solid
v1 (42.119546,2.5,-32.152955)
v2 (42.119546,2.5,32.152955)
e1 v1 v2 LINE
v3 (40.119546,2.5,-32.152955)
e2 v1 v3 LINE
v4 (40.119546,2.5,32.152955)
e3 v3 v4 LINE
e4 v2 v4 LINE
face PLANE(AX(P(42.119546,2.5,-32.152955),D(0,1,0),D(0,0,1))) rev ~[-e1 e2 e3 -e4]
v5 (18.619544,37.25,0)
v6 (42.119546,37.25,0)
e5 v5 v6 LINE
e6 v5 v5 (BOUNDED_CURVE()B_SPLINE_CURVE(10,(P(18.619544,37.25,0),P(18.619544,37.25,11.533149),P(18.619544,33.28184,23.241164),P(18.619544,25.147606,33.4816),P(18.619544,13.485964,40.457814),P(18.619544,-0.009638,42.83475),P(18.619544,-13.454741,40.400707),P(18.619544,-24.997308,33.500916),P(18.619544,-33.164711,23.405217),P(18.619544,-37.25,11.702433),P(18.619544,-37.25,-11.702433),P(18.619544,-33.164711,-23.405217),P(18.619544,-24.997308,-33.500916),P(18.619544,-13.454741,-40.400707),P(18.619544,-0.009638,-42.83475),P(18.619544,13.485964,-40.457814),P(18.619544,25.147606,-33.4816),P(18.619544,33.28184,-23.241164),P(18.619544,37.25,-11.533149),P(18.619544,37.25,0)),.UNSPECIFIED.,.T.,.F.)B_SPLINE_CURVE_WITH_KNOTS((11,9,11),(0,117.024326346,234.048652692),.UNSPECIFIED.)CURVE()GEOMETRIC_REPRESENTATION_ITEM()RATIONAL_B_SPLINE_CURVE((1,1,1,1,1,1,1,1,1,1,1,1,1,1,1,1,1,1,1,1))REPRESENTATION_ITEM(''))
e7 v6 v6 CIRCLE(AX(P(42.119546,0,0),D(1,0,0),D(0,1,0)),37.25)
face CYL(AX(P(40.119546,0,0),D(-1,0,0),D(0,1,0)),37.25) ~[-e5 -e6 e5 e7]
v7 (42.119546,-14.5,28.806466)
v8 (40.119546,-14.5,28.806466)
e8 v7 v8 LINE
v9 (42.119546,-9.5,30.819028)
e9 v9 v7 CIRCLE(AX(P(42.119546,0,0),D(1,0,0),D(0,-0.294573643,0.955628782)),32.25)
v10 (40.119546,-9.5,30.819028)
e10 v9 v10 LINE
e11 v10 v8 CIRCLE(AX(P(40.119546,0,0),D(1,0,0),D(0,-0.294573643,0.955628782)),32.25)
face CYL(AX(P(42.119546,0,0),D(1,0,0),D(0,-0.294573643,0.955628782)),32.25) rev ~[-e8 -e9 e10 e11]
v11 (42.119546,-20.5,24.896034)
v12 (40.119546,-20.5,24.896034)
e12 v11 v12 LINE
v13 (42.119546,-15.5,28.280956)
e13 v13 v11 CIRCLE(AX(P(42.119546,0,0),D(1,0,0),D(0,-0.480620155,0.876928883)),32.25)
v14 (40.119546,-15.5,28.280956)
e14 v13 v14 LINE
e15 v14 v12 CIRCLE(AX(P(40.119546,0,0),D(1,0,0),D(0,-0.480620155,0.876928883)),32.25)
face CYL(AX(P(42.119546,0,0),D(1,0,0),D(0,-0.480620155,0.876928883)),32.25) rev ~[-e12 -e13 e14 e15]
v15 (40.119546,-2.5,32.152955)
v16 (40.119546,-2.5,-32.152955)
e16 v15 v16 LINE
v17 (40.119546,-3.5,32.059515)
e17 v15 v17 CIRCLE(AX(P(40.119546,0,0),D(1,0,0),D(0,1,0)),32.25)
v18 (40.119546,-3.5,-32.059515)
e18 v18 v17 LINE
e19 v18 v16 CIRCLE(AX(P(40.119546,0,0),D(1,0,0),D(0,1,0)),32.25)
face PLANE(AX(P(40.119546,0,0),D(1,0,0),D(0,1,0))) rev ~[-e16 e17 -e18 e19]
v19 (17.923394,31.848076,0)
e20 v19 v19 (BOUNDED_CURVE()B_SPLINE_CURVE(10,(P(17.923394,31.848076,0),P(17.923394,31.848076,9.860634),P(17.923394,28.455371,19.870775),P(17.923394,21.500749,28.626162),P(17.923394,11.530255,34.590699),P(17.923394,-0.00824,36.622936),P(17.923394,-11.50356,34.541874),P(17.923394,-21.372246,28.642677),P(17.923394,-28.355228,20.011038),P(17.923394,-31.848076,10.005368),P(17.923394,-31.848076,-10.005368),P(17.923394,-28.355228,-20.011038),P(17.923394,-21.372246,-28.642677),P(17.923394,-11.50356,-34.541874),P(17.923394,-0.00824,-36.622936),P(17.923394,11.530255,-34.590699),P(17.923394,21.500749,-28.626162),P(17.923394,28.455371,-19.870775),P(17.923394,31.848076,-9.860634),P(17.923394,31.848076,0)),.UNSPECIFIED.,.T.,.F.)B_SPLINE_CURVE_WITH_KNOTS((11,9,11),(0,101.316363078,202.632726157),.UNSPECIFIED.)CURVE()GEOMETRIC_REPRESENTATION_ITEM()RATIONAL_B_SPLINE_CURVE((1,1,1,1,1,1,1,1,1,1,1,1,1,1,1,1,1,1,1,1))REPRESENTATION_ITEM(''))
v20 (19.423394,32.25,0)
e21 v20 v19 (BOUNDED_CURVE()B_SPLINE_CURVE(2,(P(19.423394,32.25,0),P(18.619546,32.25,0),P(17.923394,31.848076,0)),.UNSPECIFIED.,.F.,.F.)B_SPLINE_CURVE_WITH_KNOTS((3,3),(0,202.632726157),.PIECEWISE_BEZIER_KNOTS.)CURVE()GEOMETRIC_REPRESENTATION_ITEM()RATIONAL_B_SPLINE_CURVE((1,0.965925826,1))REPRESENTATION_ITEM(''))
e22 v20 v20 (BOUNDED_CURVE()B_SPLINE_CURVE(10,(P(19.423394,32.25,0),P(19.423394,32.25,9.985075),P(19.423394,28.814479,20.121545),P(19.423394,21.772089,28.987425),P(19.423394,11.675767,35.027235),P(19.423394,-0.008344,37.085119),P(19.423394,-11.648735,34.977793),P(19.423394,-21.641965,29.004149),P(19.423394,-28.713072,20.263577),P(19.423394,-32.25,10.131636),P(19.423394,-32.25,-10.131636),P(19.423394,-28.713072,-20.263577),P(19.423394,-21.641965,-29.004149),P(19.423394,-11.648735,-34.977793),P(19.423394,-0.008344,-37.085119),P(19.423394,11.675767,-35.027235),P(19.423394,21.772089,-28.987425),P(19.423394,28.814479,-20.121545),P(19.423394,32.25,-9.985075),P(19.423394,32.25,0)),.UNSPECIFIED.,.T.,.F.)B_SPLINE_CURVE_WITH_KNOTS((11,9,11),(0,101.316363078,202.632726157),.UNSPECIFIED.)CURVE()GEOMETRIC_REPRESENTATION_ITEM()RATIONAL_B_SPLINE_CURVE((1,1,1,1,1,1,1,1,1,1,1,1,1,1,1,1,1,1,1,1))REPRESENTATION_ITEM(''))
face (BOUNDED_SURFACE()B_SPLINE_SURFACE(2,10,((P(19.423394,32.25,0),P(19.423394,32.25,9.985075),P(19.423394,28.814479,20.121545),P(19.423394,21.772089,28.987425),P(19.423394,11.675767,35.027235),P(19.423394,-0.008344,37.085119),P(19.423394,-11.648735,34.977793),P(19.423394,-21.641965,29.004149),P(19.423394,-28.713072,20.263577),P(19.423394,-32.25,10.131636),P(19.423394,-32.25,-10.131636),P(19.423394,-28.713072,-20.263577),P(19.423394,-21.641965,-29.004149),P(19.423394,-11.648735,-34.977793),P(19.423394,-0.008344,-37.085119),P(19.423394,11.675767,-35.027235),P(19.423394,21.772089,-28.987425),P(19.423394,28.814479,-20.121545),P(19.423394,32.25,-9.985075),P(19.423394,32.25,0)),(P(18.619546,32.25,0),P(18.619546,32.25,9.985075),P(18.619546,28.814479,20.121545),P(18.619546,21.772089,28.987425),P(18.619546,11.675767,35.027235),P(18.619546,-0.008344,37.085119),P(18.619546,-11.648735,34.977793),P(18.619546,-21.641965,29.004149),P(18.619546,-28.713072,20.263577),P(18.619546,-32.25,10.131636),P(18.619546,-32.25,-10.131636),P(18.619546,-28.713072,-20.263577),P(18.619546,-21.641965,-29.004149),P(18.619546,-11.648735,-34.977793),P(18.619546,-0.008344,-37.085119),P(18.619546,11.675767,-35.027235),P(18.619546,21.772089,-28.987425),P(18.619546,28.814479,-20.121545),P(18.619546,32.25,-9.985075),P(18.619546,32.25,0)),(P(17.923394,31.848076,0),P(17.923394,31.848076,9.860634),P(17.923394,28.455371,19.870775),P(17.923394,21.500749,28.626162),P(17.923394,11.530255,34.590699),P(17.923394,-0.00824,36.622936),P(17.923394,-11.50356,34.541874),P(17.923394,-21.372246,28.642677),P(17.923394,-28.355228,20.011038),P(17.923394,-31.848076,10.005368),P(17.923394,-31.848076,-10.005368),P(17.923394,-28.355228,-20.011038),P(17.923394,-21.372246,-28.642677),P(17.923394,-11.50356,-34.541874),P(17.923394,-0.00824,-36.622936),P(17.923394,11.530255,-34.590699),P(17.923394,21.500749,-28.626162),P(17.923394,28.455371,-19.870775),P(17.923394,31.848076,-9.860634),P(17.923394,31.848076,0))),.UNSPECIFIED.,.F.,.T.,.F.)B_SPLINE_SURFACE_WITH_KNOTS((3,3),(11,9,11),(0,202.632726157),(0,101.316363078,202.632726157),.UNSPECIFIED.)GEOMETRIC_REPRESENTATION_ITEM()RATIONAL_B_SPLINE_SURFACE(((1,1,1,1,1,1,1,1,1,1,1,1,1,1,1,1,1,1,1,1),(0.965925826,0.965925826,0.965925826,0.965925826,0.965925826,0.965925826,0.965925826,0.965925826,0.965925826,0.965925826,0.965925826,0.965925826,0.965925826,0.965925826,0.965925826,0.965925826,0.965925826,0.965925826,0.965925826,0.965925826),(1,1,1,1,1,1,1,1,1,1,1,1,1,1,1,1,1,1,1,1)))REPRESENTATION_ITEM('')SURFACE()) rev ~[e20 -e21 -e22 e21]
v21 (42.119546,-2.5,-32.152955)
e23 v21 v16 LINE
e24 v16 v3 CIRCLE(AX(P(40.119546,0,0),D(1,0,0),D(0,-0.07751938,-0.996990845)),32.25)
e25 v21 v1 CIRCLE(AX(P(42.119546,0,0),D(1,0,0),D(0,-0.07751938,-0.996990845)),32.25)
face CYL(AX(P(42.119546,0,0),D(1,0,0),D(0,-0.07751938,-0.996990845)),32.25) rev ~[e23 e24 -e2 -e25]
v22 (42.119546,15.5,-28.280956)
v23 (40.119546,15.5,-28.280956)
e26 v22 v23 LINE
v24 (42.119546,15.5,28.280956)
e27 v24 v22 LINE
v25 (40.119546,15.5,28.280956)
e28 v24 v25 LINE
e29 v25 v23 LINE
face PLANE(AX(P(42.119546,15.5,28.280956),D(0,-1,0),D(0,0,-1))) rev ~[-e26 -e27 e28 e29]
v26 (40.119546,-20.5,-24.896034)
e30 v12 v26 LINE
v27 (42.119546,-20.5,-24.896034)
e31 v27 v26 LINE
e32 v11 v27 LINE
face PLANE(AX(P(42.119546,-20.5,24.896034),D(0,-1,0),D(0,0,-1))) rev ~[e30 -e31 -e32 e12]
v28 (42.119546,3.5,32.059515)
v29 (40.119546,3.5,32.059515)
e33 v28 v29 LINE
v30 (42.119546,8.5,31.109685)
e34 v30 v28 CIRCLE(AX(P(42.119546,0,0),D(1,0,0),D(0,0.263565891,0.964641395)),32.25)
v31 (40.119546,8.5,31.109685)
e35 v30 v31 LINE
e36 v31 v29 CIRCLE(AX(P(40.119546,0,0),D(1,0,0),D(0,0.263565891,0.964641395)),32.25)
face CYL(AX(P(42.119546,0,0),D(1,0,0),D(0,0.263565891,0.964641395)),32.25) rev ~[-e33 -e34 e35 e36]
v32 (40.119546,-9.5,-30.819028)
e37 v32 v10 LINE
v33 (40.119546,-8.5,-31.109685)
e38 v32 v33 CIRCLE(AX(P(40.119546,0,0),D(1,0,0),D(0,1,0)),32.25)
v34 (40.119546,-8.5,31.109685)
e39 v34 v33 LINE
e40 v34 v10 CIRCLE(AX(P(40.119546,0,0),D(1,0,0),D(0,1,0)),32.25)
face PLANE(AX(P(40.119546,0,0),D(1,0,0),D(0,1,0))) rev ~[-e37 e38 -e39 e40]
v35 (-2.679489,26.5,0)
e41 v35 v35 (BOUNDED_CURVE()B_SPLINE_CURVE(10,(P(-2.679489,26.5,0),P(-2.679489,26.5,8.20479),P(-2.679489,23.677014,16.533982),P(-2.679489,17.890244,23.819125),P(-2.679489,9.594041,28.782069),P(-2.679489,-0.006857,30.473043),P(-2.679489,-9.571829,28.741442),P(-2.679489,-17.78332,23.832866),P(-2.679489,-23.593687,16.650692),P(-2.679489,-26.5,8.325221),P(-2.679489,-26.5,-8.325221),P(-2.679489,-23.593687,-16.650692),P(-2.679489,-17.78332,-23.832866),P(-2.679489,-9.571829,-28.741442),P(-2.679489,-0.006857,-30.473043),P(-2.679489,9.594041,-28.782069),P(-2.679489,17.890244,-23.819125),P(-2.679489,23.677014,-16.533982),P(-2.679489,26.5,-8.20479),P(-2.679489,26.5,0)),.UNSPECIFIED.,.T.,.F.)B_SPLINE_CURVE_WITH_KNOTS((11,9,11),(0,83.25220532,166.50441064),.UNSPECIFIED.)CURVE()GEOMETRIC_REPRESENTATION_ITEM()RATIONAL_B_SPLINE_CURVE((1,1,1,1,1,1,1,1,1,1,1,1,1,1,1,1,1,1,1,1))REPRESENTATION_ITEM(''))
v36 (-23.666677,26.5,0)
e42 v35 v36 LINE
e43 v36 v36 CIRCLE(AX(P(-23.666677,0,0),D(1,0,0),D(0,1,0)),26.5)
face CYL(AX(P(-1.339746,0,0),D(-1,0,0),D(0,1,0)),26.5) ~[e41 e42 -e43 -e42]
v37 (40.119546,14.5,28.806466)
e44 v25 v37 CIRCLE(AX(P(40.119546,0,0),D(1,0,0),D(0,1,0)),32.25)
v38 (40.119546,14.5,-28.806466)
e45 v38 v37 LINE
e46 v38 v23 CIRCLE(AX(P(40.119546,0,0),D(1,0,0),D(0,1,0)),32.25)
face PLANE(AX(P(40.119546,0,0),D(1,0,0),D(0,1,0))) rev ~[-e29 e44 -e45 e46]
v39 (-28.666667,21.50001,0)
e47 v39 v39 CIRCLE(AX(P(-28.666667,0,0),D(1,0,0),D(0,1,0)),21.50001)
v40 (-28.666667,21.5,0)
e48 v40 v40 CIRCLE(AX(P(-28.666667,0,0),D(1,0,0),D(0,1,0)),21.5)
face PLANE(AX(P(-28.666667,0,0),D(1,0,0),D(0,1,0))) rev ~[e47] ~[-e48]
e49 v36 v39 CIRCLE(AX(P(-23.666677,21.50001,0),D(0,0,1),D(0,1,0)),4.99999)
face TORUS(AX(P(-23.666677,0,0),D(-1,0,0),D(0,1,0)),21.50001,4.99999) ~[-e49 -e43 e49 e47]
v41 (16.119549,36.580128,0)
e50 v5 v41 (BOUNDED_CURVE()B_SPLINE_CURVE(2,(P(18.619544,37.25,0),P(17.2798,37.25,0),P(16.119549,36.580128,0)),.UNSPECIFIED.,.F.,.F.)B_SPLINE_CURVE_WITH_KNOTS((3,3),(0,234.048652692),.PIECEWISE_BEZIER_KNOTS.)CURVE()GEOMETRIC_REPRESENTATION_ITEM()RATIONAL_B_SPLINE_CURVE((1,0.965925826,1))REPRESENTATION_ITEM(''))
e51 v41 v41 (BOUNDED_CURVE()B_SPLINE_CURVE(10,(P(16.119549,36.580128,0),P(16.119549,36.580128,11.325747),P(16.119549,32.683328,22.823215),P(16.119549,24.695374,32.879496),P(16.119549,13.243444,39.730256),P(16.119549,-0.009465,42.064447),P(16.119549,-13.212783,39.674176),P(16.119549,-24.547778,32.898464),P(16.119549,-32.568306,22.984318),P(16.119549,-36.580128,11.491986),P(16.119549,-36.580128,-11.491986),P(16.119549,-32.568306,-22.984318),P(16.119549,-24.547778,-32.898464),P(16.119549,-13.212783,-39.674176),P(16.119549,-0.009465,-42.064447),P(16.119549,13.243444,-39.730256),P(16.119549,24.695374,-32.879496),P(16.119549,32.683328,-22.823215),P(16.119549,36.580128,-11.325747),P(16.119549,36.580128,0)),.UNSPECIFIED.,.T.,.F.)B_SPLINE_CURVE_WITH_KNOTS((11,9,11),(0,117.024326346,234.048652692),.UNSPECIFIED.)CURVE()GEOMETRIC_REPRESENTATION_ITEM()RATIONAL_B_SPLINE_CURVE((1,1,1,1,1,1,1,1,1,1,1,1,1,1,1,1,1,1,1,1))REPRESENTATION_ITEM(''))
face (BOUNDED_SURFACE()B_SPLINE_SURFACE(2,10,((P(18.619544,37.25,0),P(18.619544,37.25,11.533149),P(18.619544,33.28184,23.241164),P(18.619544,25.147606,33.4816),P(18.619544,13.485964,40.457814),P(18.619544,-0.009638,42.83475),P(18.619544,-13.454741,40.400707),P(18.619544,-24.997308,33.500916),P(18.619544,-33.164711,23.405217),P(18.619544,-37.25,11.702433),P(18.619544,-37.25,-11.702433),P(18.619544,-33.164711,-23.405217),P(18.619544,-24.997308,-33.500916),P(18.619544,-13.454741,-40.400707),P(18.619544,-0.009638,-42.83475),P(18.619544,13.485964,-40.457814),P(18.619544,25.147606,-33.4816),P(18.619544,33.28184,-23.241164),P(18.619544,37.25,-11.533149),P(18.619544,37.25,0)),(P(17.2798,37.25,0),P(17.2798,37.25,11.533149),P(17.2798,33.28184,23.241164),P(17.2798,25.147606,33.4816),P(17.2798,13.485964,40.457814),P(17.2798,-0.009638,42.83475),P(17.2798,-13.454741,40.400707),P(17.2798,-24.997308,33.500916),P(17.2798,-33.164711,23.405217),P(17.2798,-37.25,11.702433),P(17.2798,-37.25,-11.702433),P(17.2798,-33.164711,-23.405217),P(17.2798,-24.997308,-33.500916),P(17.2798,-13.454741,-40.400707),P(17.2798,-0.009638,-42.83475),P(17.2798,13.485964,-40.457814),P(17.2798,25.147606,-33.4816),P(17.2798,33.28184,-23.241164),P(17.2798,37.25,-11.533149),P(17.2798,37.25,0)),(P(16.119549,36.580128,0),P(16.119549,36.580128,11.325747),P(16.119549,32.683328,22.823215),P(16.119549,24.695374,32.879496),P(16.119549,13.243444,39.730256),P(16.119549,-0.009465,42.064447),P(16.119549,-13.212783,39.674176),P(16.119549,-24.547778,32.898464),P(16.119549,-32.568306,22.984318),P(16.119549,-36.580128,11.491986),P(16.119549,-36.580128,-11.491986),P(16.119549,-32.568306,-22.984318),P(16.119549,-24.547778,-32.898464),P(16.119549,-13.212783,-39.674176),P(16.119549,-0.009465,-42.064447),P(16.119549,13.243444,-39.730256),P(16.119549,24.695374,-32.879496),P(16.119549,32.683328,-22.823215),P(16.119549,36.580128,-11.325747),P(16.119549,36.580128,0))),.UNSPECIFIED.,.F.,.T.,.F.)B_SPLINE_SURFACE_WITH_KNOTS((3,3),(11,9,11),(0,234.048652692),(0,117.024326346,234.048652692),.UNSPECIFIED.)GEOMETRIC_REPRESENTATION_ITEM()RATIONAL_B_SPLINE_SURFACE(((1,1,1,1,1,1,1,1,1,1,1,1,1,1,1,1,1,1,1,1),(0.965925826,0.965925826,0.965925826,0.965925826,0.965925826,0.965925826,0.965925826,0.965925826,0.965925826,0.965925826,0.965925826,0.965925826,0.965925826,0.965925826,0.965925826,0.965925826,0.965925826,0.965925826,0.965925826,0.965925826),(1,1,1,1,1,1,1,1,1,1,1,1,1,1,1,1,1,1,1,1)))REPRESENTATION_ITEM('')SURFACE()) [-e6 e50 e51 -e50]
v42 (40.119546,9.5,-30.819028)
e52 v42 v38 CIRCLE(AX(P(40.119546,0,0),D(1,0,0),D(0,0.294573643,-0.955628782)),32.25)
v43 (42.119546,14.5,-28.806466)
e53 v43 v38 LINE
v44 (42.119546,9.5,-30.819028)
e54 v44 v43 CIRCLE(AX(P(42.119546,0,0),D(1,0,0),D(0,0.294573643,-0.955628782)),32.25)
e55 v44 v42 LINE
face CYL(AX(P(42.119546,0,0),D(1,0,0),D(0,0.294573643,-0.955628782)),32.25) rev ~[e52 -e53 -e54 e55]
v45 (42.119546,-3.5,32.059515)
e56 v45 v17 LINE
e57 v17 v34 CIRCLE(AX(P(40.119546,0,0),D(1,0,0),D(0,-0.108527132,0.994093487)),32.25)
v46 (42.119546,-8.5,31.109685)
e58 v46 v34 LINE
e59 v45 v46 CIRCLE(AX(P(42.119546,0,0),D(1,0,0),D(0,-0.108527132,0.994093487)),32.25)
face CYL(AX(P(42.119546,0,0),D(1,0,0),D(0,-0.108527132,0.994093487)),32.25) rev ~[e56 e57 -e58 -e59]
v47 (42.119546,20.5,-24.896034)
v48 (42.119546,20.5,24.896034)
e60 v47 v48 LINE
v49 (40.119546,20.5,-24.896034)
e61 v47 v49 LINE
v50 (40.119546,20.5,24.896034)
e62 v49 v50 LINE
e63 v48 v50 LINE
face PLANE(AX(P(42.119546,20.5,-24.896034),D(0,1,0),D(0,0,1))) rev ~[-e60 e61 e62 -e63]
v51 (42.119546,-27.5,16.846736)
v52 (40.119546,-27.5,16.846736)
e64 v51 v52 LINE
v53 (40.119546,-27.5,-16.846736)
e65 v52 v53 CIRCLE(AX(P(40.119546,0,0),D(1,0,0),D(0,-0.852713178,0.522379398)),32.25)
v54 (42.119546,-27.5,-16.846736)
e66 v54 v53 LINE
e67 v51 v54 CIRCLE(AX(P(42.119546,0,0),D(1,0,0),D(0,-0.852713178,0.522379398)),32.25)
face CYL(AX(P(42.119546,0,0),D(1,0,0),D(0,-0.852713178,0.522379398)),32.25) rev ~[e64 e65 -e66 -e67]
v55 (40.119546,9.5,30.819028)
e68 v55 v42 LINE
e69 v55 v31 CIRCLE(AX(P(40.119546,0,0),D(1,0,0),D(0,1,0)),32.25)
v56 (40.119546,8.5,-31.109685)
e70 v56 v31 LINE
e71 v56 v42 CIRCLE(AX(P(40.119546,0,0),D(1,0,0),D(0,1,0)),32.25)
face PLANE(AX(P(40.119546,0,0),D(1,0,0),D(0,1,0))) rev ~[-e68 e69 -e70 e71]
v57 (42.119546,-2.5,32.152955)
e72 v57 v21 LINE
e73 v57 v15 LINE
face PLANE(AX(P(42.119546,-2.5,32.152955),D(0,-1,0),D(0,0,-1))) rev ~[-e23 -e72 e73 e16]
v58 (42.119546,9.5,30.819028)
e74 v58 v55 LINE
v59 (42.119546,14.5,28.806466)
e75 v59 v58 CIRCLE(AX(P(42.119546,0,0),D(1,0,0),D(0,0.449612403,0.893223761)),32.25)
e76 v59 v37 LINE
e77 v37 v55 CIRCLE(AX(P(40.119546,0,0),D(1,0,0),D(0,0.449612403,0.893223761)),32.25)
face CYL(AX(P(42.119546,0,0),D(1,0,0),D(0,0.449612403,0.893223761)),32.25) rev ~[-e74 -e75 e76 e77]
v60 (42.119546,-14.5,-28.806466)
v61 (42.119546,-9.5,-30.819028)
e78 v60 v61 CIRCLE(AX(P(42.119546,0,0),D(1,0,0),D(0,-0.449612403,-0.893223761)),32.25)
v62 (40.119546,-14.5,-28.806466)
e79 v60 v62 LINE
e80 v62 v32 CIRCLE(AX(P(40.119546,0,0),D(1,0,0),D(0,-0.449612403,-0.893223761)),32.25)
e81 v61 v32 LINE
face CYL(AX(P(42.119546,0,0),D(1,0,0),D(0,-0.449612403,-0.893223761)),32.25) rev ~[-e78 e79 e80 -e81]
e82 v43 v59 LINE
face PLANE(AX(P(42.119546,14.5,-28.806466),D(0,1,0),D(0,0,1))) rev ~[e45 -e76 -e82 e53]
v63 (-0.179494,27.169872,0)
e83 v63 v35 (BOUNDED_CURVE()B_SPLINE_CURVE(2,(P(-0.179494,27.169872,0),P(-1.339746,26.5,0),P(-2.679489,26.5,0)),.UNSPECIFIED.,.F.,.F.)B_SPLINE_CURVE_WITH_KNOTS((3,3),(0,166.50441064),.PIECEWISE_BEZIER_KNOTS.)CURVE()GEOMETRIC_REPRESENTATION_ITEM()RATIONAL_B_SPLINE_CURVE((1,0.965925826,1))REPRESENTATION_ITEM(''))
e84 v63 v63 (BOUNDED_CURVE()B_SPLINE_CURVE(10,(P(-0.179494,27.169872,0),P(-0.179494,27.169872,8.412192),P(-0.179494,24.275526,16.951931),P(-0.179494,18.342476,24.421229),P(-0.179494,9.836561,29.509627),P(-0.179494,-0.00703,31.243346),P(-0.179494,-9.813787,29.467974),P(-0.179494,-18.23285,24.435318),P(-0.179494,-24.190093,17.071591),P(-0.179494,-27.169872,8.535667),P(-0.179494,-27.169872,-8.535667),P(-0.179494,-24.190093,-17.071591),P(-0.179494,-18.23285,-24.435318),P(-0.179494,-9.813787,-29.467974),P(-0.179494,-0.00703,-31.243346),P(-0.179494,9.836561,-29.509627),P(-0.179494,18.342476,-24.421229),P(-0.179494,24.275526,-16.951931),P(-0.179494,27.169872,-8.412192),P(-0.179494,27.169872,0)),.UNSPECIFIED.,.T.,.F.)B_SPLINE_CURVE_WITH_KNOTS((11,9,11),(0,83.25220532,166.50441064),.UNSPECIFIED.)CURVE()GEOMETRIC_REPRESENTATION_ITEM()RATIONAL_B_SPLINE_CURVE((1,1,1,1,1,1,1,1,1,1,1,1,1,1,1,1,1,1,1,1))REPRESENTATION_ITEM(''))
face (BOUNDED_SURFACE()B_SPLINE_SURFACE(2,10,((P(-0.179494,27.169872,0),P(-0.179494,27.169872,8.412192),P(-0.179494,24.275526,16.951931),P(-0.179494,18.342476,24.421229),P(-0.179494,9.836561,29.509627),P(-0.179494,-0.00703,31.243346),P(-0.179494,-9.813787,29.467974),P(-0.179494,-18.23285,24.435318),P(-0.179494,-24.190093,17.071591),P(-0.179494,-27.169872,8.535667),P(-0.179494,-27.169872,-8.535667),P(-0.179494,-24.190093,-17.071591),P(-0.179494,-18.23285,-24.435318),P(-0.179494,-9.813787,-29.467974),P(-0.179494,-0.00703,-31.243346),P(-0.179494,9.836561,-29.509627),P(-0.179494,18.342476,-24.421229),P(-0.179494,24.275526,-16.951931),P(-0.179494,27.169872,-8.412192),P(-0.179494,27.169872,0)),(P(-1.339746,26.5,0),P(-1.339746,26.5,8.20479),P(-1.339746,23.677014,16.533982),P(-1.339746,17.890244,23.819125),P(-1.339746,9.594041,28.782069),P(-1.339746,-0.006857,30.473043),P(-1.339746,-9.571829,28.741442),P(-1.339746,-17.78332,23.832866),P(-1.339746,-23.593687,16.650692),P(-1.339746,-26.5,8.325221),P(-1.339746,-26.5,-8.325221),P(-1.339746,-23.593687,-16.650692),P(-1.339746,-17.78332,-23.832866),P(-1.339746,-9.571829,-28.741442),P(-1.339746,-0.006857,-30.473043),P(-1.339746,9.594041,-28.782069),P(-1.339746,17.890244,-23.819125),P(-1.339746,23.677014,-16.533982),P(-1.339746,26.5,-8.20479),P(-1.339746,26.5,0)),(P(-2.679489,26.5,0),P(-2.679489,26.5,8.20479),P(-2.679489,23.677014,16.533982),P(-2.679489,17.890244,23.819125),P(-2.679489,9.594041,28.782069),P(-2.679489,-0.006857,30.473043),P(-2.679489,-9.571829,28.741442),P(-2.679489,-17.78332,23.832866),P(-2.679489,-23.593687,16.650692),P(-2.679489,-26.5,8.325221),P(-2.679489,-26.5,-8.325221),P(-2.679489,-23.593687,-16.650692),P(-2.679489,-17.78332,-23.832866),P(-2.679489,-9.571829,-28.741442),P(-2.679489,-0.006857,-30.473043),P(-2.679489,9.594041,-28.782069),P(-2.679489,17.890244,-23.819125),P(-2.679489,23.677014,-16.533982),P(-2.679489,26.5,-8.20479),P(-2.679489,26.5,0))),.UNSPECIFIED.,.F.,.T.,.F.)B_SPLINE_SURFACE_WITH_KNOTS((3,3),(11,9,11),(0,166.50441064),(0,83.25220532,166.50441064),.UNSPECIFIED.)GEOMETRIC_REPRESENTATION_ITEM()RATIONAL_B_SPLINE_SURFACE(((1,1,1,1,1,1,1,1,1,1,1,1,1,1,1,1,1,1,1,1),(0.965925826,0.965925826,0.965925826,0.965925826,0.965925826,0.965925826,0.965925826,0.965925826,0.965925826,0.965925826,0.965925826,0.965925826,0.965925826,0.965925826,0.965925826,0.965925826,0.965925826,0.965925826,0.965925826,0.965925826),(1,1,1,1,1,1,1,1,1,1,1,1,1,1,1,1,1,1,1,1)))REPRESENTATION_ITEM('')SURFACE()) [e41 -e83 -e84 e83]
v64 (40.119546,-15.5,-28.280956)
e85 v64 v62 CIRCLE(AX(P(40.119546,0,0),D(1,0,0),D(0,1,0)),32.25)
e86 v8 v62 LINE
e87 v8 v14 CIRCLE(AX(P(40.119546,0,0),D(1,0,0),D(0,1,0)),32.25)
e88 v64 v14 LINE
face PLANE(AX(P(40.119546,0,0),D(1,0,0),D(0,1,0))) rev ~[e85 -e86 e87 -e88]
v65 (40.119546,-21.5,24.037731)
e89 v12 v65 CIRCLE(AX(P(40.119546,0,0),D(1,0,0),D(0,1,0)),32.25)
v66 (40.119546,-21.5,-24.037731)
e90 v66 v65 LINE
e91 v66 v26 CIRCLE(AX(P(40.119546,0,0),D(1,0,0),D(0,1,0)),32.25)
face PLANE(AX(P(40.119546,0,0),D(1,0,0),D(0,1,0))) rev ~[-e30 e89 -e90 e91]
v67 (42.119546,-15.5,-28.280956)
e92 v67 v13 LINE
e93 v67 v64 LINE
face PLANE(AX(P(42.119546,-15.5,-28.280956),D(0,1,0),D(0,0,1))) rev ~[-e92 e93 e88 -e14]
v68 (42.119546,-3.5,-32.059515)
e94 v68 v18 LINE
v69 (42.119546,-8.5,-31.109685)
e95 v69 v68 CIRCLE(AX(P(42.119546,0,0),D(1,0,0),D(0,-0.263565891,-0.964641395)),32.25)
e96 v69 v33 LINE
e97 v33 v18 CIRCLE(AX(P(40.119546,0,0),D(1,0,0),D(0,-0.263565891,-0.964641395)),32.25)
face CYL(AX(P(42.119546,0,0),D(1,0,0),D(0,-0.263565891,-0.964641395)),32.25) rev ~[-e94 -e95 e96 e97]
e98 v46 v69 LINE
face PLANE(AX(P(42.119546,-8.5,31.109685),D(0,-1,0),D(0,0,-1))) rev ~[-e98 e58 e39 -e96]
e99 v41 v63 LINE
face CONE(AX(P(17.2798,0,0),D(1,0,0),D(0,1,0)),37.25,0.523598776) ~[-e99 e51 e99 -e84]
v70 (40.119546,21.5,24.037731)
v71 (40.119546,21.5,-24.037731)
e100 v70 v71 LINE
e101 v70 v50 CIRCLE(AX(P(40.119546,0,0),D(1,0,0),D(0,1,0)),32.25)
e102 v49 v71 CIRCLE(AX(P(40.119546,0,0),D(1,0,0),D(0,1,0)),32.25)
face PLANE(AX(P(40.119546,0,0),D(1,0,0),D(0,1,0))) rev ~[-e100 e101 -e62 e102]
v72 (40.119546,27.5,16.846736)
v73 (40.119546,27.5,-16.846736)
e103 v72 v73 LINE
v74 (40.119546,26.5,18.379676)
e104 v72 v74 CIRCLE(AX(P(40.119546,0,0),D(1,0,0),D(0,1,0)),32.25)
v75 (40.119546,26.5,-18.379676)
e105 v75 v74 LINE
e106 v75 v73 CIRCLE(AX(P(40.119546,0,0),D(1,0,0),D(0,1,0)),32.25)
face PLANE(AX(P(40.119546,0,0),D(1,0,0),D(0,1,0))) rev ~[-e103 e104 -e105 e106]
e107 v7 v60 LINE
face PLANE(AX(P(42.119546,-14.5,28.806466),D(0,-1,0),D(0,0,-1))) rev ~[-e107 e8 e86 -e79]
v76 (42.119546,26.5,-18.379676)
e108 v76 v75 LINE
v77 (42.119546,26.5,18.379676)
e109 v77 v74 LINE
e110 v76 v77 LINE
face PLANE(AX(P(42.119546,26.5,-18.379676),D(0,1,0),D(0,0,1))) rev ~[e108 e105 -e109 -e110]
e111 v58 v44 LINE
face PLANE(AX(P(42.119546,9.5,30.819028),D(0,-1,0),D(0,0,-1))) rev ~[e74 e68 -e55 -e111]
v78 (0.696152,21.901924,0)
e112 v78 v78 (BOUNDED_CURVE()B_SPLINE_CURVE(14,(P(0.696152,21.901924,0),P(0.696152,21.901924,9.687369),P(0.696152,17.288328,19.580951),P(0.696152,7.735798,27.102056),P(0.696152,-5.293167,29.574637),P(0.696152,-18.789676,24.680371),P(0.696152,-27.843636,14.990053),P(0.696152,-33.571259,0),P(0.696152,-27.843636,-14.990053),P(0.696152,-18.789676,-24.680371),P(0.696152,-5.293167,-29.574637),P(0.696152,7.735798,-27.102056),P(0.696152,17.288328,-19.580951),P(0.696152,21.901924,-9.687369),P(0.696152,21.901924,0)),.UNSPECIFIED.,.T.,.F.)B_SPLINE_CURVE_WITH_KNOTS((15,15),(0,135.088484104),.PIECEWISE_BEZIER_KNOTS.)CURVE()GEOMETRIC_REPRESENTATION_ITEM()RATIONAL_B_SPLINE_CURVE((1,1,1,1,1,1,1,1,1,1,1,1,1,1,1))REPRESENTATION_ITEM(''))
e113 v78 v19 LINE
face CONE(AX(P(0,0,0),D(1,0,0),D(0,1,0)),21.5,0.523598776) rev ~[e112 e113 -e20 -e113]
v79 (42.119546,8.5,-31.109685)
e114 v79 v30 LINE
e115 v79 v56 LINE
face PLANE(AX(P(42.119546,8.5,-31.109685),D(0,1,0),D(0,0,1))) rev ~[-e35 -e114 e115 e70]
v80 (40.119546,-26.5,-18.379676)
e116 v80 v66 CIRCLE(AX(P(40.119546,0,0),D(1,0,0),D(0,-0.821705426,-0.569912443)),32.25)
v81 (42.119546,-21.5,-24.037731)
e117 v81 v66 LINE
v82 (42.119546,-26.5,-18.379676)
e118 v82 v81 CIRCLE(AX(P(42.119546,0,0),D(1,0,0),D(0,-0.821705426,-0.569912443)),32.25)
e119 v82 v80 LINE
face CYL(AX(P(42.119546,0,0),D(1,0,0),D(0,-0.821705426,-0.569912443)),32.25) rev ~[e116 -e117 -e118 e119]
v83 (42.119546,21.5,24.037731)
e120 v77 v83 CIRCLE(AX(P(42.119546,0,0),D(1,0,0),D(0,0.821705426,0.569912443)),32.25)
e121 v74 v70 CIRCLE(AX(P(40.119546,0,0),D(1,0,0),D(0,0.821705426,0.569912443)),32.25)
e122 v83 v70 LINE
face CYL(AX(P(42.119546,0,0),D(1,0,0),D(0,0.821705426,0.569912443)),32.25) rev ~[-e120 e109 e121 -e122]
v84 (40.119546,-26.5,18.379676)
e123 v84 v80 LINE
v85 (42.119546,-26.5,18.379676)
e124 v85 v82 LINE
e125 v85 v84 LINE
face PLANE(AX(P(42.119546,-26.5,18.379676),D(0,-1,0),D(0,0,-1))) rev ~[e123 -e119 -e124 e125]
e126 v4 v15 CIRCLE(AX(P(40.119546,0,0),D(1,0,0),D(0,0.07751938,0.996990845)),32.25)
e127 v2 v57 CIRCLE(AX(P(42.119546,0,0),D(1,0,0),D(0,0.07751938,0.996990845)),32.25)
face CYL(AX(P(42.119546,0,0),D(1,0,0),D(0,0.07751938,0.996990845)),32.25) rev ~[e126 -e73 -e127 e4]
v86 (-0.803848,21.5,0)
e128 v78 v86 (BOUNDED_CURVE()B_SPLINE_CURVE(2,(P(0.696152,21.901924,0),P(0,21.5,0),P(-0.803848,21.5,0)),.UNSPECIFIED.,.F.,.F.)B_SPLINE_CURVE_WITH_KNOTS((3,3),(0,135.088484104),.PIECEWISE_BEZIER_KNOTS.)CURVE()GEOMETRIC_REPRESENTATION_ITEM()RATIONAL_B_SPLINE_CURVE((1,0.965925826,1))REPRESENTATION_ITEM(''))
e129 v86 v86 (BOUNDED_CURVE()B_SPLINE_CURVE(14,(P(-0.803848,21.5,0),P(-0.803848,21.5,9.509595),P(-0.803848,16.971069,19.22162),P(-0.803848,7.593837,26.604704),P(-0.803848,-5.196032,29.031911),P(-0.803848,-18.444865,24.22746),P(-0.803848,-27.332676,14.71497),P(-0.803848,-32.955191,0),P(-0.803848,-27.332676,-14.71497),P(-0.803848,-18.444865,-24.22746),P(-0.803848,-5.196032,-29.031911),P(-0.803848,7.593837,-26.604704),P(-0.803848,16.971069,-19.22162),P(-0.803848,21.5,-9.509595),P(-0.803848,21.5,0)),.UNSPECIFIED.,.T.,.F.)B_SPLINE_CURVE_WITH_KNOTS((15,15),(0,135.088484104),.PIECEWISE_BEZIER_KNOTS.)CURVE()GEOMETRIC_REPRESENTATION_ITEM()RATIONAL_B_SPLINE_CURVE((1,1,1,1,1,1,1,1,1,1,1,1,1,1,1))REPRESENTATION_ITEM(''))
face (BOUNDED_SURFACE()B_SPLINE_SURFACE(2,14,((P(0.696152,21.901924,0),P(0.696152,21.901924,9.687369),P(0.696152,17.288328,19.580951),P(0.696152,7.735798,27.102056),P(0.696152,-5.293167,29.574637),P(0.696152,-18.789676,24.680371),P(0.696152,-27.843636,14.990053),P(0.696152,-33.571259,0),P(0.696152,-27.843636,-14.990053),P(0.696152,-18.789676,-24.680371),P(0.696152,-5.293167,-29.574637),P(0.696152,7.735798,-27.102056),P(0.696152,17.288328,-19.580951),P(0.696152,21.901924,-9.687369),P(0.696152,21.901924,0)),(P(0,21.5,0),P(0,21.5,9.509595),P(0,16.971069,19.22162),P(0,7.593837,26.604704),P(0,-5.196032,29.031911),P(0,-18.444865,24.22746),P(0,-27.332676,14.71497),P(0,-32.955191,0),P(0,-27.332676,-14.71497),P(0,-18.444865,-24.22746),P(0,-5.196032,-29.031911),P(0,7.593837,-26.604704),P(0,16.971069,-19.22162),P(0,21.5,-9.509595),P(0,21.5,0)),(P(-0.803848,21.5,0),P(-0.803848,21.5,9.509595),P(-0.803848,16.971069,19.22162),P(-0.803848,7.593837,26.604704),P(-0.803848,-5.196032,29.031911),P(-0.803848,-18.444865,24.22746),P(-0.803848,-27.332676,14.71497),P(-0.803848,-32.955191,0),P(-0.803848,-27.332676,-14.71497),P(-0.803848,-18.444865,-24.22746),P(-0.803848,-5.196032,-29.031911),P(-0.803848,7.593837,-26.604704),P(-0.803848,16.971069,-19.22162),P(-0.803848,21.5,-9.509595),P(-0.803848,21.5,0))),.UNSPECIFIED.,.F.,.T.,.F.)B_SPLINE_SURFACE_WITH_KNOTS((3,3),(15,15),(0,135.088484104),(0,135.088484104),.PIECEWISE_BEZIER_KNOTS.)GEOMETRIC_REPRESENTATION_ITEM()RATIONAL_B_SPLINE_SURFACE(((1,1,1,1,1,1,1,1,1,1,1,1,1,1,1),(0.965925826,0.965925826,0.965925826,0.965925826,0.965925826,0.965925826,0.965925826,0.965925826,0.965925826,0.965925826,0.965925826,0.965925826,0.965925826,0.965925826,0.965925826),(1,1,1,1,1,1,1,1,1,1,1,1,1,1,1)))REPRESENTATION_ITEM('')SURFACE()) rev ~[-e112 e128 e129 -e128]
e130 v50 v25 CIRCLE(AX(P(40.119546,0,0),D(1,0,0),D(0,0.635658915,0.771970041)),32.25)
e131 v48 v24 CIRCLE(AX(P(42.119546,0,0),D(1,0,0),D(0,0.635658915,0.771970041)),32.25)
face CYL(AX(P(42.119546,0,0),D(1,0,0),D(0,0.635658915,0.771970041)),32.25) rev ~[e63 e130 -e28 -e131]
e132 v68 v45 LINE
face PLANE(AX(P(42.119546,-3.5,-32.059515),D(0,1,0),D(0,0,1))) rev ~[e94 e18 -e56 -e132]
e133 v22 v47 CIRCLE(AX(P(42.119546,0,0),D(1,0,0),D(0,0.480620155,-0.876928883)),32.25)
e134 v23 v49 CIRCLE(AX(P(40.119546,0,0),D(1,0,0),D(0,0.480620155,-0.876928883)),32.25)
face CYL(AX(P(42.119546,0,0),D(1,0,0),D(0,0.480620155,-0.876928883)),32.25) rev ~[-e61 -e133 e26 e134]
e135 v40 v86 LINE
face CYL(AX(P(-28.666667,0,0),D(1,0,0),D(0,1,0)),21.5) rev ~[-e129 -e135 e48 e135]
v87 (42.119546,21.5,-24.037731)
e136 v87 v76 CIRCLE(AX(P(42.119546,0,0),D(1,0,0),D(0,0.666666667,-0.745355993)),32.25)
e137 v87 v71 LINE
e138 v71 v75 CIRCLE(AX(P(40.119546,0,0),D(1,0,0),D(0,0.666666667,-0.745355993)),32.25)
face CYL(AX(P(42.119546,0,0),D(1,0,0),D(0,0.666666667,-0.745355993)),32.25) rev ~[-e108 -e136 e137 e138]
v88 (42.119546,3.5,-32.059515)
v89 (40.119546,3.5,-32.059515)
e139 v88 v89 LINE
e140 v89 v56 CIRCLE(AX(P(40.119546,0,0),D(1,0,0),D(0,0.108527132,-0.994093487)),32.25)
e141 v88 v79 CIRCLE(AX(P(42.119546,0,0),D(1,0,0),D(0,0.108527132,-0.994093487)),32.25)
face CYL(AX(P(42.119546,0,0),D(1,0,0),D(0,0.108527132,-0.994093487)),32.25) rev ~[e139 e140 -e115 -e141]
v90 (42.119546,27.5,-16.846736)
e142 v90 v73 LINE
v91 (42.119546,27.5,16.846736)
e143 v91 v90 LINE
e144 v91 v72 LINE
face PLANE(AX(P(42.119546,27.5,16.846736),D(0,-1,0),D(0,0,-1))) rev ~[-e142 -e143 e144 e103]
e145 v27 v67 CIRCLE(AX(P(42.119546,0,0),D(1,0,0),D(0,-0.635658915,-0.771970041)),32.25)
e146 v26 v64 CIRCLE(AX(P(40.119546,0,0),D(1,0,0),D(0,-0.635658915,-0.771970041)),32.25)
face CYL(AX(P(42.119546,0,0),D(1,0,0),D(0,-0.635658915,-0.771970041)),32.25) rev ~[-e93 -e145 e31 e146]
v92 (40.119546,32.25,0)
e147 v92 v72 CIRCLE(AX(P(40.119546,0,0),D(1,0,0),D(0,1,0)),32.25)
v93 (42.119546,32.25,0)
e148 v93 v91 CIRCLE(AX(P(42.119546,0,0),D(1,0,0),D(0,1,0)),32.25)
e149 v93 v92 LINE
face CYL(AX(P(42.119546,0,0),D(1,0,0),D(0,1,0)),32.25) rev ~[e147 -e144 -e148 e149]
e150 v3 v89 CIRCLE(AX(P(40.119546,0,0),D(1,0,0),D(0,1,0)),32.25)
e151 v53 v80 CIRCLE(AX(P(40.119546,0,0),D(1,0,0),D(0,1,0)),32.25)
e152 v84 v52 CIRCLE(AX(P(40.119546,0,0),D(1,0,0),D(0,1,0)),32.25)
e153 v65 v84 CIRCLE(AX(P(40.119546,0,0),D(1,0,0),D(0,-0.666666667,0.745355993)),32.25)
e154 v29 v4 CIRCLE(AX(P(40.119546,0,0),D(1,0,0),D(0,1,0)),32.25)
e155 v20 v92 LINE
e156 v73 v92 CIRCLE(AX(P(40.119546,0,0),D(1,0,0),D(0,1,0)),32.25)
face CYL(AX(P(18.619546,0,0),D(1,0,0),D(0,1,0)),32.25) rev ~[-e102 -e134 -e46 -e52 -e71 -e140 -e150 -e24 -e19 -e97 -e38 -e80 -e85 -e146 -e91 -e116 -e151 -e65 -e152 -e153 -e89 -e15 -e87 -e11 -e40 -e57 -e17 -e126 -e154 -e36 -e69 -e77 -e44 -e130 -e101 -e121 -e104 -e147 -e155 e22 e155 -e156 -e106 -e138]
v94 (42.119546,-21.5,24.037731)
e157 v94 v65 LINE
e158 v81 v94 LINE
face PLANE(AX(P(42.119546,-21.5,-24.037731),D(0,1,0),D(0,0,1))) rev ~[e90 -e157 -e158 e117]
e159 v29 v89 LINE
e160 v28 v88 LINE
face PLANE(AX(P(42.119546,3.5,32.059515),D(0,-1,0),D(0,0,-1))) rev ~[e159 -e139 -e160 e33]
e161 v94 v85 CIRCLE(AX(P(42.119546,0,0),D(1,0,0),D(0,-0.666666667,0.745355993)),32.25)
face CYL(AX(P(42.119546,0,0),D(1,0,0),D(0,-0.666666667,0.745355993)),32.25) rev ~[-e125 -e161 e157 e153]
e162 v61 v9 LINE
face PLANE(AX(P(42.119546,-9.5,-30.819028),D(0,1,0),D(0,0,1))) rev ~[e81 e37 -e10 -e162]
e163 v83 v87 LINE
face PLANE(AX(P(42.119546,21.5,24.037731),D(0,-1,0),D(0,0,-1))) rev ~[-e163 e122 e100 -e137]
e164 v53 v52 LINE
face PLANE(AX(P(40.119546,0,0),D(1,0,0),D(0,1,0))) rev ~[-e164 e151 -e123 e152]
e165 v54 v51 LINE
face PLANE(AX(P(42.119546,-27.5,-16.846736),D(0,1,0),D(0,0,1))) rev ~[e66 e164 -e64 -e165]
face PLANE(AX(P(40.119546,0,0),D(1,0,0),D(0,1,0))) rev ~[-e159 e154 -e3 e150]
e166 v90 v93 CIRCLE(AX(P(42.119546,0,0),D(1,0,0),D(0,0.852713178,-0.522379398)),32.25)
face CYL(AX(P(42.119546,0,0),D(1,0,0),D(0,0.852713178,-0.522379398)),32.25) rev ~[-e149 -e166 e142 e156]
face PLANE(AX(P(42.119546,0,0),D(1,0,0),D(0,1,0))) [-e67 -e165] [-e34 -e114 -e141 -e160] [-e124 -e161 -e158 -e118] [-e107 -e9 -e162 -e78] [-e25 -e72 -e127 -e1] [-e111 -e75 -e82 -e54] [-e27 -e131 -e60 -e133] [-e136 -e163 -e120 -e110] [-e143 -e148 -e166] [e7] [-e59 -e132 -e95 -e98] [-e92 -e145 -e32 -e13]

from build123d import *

# Parameters (mm, degrees)
F2_R     = 37.25
F3_DEPTH = 2
F5_DEPTH = 2
F6_R     = 4.99999
F7_R     = 3


# Not quite as in the source:
# - a fillet or chamfer is up to 0.001 mm smaller than in the source, because OpenCascade refuses the exact size


with BuildPart() as f1:
    # F0 (on Top) → F1 (revolve)
    with BuildSketch(Plane.XY):
        Polygon((-28.6666666667, 26.5), (-28.6666666667, 21.5), (0, 21.5), (18.6195461814, 32.25), (40.1195461814, 32.25), (40.1195461814, 37.25), (17.2798002192, 37.25), (-1.3397459622, 26.5), align=None)
    revolve(axis=Axis((-8.7595172226, 0, 0), (1, 0, 0)))

    # F2 (on face) → F3 (join)
    with BuildSketch(Plane.YZ.offset(40.1195461814)):
        Circle(F2_R)
    extrude(amount=F3_DEPTH)

    # F4 (on face) → F5 (cut, through all)
    with BuildSketch(Plane.YZ.offset(42.1195461814)):
        with BuildLine():
            ThreePointArc((32.25, 0), (31.0397930083, 8.7517855321), (27.5, 16.8467355888))
            Line((27.5, 16.8467355888), (27.5, -16.8467355888))
            ThreePointArc((27.5, -16.8467355888), (31.0397930083, -8.7517855321), (32.25, 0))
        make_face()
        with BuildLine():
            ThreePointArc((26.5, 18.3796762757), (24.1661621929, 21.3555403788), (21.5, 24.0377307581))
            Line((21.5, 24.0377307581), (21.5, -24.0377307581))
            ThreePointArc((21.5, -24.0377307581), (24.1661621929, -21.3555403788), (26.5, -18.3796762757))
            Line((26.5, -18.3796762757), (26.5, 18.3796762757))
        make_face()
        with BuildLine():
            ThreePointArc((20.5, 24.8960338207), (18.0793922843, 26.7057685647), (15.5, 28.2809564902))
            Line((15.5, 28.2809564902), (15.5, -28.2809564902))
            ThreePointArc((15.5, -28.2809564902), (18.0793922843, -26.7057685647), (20.5, -24.8960338207))
            Line((20.5, -24.8960338207), (20.5, 24.8960338207))
        make_face()
        with BuildLine():
            ThreePointArc((14.5, 28.806466288), (12.0421178111, 29.9173845552), (9.5, 30.8190282131))
            Line((9.5, 30.8190282131), (9.5, -30.8190282131))
            ThreePointArc((9.5, -30.8190282131), (12.0421178111, -29.9173845552), (14.5, -28.806466288))
            Line((14.5, -28.806466288), (14.5, 28.806466288))
        make_face()
        with BuildLine():
            ThreePointArc((8.5, 31.1096849872), (6.0187660071, 31.6833861156), (3.5, 32.0595149683))
            Line((3.5, 32.0595149683), (3.5, -32.0595149683))
            ThreePointArc((3.5, -32.0595149683), (6.0187660071, -31.6833861156), (8.5, -31.1096849872))
            Line((8.5, -31.1096849872), (8.5, 31.1096849872))
        make_face()
        with BuildLine():
            ThreePointArc((2.5, 32.1529547631), (0, 32.25), (-2.5, 32.1529547631))
            Line((-2.5, 32.1529547631), (-2.5, -32.1529547631))
            ThreePointArc((-2.5, -32.1529547631), (0, -32.25), (2.5, -32.1529547631))
            Line((2.5, -32.1529547631), (2.5, 32.1529547631))
        make_face()
        with BuildLine():
            Line((-3.5, -32.0595149683), (-3.5, 32.0595149683))
            ThreePointArc((-3.5, 32.0595149683), (-6.0187660071, 31.6833861156), (-8.5, 31.1096849872))
            Line((-8.5, 31.1096849872), (-8.5, -31.1096849872))
            ThreePointArc((-8.5, -31.1096849872), (-6.0187660071, -31.6833861156), (-3.5, -32.0595149683))
        make_face()
        with BuildLine():
            Line((-9.5, -30.8190282131), (-9.5, 30.8190282131))
            ThreePointArc((-9.5, 30.8190282131), (-12.0421178111, 29.9173845552), (-14.5, 28.806466288))
            Line((-14.5, 28.806466288), (-14.5, -28.806466288))
            ThreePointArc((-14.5, -28.806466288), (-12.0421178111, -29.9173845552), (-9.5, -30.8190282131))
        make_face()
        with BuildLine():
            Line((-15.5, -28.2809564902), (-15.5, 28.2809564902))
            ThreePointArc((-15.5, 28.2809564902), (-18.0793922843, 26.7057685647), (-20.5, 24.8960338207))
            Line((-20.5, 24.8960338207), (-20.5, -24.8960338207))
            ThreePointArc((-20.5, -24.8960338207), (-18.0793922843, -26.7057685647), (-15.5, -28.2809564902))
        make_face()
        with BuildLine():
            Line((-21.5, -24.0377307581), (-21.5, 24.0377307581))
            ThreePointArc((-21.5, 24.0377307581), (-24.1661621929, 21.3555403788), (-26.5, 18.3796762757))
            Line((-26.5, 18.3796762757), (-26.5, -18.3796762757))
            ThreePointArc((-26.5, -18.3796762757), (-24.1661621929, -21.3555403788), (-21.5, -24.0377307581))
        make_face()
        with BuildLine():
            Line((-27.5, -16.8467355888), (-27.5, 16.8467355888))
            ThreePointArc((-27.5, 16.8467355888), (-32.25, 0), (-27.5, -16.8467355888))
        make_face()
    extrude(amount=-F5_DEPTH, mode=Mode.SUBTRACT)

    # F6 (radius 5 in the source; OpenCascade refuses exactly that, so slightly less here)
    f6_edges = [f1.edges().sort_by_distance(p)[0] for p in [
        (-28.666667, -26.5, 0),
        (-1.339746, -26.5, 0),
        (17.2798, -37.25, 0),
    ]]
    fillet(f6_edges, radius=F6_R)

    # F7
    f7_edges = [f1.edges().sort_by_distance(p)[0] for p in [
        (18.619546, -32.25, 0),
        (0, -21.5, 0),
    ]]
    fillet(f7_edges, radius=F7_R)


solid = f1.part
